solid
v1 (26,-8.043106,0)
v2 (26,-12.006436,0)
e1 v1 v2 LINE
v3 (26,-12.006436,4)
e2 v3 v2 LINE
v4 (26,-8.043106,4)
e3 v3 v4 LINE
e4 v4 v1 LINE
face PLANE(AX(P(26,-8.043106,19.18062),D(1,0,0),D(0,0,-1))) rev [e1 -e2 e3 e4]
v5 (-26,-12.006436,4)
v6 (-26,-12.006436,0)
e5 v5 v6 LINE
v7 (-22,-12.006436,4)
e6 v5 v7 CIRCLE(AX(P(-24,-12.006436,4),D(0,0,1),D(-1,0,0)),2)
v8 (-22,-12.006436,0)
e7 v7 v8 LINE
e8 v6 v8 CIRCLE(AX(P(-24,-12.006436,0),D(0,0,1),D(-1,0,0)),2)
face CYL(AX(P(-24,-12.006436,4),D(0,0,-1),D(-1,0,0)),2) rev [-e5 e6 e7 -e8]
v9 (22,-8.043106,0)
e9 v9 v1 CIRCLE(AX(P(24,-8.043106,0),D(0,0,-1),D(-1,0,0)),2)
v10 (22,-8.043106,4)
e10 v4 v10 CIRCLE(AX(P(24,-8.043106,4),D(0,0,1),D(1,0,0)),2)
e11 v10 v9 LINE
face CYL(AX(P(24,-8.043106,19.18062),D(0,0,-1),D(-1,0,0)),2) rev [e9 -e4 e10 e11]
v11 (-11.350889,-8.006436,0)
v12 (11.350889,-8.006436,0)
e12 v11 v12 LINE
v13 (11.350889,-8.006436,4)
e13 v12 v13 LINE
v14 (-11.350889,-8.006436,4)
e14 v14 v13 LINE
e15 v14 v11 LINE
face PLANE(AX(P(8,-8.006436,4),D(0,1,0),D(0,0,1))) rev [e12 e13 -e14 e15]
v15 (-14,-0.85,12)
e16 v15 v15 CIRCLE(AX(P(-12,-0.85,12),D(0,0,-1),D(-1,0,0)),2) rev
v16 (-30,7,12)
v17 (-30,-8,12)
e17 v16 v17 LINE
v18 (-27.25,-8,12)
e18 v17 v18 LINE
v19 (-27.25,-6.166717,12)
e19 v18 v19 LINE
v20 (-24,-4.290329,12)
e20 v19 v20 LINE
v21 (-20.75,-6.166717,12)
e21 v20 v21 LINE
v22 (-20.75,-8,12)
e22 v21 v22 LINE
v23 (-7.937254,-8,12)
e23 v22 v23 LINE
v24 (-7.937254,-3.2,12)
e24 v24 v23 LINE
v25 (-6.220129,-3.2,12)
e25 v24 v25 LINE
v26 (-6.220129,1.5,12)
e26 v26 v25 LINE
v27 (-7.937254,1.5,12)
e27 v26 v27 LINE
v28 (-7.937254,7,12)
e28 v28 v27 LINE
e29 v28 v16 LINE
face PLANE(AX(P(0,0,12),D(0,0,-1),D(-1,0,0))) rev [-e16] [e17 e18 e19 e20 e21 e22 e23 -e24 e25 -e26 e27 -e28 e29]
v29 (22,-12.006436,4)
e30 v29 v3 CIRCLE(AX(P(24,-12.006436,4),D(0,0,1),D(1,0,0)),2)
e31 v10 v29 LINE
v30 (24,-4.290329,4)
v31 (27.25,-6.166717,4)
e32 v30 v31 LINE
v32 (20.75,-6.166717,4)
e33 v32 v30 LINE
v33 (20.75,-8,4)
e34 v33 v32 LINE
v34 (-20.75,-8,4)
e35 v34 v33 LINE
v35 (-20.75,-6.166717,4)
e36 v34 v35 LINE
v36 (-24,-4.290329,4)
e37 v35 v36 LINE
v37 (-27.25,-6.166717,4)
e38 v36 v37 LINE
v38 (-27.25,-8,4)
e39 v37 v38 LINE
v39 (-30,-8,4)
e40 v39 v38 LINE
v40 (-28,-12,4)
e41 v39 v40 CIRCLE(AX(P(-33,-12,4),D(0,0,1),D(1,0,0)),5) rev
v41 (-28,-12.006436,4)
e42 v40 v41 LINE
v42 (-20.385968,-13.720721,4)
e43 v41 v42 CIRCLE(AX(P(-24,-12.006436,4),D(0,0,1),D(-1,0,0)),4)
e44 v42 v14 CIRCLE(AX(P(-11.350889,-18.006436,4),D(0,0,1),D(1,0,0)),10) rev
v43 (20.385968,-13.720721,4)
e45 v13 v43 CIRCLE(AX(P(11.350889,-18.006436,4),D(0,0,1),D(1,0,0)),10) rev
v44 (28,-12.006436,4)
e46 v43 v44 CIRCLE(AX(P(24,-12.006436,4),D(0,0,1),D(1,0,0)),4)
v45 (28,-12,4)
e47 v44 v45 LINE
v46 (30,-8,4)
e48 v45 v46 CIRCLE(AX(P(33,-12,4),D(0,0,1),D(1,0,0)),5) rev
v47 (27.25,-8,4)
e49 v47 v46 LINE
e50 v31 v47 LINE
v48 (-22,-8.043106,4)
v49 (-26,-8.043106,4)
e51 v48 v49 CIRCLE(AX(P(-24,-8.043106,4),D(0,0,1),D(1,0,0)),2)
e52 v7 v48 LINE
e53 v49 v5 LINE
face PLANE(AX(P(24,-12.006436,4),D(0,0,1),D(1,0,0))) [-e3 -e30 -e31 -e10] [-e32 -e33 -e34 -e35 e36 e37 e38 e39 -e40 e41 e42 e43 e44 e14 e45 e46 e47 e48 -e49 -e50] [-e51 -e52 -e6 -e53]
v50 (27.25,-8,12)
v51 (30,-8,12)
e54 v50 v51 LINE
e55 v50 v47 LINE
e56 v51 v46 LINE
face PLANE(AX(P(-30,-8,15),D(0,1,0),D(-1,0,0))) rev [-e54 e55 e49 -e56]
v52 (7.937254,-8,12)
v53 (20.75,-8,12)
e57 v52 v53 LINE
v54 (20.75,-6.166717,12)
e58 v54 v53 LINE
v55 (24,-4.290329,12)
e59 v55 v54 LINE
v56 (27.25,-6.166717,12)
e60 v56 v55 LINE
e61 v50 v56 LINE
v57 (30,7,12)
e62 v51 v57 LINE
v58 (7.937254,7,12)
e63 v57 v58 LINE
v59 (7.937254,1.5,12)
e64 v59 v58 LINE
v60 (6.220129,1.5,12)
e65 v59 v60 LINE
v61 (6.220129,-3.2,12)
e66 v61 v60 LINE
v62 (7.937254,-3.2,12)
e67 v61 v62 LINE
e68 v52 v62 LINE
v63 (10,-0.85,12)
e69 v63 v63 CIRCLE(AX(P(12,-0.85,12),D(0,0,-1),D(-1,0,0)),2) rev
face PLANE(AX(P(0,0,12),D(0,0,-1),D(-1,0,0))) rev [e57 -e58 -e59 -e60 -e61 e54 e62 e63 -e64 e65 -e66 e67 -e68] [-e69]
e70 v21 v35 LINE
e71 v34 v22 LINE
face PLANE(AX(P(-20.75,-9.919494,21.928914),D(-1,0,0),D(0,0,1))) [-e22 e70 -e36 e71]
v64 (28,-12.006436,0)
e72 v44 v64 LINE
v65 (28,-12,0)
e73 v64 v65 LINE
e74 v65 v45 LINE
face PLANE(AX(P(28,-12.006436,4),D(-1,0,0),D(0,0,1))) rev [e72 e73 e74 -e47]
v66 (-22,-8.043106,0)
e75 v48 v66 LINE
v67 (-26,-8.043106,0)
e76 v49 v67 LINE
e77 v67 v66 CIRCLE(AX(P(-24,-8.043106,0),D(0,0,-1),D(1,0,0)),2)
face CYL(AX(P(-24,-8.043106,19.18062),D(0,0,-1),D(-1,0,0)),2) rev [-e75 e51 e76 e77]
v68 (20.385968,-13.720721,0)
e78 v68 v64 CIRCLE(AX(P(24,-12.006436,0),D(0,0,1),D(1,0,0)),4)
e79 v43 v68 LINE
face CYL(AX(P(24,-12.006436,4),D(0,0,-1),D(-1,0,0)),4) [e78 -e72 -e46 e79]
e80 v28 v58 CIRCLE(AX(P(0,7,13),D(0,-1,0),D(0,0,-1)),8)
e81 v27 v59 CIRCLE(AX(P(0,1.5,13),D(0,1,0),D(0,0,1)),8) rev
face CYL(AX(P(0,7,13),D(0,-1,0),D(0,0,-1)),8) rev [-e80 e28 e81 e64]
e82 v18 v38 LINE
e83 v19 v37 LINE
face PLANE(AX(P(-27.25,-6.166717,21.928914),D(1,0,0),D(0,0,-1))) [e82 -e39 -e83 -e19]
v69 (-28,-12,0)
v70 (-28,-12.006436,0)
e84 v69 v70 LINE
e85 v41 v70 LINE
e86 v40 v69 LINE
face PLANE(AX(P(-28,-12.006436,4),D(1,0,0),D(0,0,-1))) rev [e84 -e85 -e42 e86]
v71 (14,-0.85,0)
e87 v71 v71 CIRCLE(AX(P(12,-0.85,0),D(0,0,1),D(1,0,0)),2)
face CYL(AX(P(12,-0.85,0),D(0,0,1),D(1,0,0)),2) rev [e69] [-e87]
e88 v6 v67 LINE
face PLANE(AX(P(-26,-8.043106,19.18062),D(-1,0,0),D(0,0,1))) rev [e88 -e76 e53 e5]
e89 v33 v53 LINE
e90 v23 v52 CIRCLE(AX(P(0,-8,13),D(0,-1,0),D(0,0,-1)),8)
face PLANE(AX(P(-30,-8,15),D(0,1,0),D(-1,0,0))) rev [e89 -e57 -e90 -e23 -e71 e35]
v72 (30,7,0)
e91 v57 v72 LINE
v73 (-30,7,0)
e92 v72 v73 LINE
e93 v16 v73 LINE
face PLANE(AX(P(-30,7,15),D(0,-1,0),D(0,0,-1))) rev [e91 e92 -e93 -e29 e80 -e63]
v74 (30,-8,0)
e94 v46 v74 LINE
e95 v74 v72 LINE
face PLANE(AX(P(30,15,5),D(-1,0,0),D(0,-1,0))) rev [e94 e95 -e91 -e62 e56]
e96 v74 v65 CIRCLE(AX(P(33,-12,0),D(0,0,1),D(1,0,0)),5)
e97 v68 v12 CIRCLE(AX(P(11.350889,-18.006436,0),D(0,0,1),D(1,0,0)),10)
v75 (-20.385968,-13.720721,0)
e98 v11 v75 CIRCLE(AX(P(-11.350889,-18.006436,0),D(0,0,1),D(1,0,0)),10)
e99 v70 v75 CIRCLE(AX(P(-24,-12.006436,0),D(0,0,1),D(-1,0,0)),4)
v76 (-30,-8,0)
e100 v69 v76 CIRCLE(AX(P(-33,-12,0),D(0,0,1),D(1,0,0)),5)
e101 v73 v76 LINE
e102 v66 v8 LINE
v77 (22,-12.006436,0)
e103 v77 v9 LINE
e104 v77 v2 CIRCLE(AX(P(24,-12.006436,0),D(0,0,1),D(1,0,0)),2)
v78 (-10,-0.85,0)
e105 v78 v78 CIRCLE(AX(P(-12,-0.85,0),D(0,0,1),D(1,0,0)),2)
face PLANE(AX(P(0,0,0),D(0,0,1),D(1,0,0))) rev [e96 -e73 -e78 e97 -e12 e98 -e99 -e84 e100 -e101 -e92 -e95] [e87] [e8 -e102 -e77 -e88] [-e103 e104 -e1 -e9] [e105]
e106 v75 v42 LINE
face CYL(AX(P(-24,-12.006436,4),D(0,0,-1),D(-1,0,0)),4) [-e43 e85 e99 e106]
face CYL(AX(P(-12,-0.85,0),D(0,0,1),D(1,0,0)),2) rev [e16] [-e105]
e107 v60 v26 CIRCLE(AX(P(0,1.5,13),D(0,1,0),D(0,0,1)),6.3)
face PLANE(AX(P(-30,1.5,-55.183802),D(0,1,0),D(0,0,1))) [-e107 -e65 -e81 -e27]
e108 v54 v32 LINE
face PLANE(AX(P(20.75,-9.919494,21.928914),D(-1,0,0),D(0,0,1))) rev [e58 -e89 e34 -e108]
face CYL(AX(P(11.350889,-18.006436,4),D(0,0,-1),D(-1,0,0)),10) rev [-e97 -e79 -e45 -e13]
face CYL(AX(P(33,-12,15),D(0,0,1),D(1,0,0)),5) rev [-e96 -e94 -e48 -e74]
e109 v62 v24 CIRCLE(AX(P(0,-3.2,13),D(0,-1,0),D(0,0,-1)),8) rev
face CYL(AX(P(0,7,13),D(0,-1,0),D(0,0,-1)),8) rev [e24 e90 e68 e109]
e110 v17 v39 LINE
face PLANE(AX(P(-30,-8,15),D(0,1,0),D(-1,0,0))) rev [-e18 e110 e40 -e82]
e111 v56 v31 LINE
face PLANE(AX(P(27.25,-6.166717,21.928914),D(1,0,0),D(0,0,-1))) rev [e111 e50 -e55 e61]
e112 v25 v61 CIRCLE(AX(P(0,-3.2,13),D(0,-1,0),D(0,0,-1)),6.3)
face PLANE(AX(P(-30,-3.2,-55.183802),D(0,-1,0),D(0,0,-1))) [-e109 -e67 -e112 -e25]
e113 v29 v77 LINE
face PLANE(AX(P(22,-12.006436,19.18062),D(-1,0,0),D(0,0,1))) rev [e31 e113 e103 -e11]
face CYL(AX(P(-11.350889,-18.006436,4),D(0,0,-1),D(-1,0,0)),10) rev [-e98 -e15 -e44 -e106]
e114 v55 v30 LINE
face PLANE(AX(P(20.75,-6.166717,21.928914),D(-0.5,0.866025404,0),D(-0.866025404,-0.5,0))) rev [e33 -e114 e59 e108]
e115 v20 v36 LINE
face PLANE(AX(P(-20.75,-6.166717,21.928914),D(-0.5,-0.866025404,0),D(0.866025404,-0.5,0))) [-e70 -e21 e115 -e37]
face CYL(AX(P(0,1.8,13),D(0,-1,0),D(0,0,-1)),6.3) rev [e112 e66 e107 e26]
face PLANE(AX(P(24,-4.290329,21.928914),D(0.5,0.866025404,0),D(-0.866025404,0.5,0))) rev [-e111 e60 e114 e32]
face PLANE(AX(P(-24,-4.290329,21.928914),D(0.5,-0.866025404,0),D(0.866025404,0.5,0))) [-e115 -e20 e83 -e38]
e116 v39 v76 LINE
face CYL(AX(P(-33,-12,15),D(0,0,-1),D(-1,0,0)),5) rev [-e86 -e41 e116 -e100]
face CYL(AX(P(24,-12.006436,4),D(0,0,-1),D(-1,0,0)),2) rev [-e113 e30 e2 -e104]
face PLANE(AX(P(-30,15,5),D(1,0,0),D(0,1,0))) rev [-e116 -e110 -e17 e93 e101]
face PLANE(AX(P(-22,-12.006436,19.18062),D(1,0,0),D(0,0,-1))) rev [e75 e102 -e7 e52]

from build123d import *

# Parameters (mm, degrees)
SCHIZZO1_W                   = 60
SCHIZZO1_H                   = 30
ESTRUSIONE_ESTRUSIONE1_DEPTH = 5
SCHIZZO2_W                   = 60
SCHIZZO2_H                   = 8
ESTRUSIONE_ESTRUSIONE2_DEPTH = 20
SCHIZZO3_R                   = 5
TAGLIO_ESTRUSIONE1_DEPTH     = 8
RACCORDO1_R                  = 20
SCHIZZO4_W                   = 60
SCHIZZO4_H                   = 15
ESTRUSIONE_ESTRUSIONE3_DEPTH = 10
SCHIZZO6_R                   = 8
TAGLIO_ESTRUSIONE2_DEPTH     = 15
SCHIZZO8_W                   = 60
SCHIZZO8_H                   = 4.7
ESTRUSIONE_ESTRUSIONE4_DEPTH = 10
SCHIZZO9_R                   = 6.3
TAGLIO_ESTRUSIONE3_DEPTH     = 5
SCHIZZO10_R                  = 2
TAGLIO_ESTRUSIONE4_DEPTH     = 37.742346142
SCHIZZO11_W                  = 60
SCHIZZO11_H                  = 8
TAGLIO_ESTRUSIONE5_DEPTH     = 25
SCHIZZO14_W                  = 60
SCHIZZO14_H                  = 5
TAGLIO_ESTRUSIONE7_DEPTH     = 7
SCHIZZO12_R                  = 2
ESTRUSIONE_ESTRUSIONE5_DEPTH = 4
SCHIZZO17_W                  = 60
SCHIZZO17_H                  = 15
TAGLIO_ESTRUSIONE9_DEPTH     = 3
TAGLIO_ESTRUSIONE10_REACH    = 38.058
TAGLIO_ESTRUSIONE12_DEPTH    = 8
RACCORDO2_R                  = 5
RACCORDO3_R                  = 10


with BuildPart() as part:
    # Schizzo1 → Estrusione-Estrusione1 (new body)
    with BuildSketch(Plane.XY):
        Rectangle(SCHIZZO1_W, SCHIZZO1_H)
    extrude(amount=ESTRUSIONE_ESTRUSIONE1_DEPTH)

    # Schizzo2 → Estrusione-Estrusione2 (add)
    with BuildSketch(Plane.XY.offset(5)):
        with Locations((0, 11)):
            Rectangle(SCHIZZO2_W, SCHIZZO2_H)
    extrude(amount=ESTRUSIONE_ESTRUSIONE2_DEPTH)

    # Schizzo3 → Taglio-Estrusione1 (cut)
    with BuildSketch(Plane(origin=(0, 15, 0), x_dir=(1, 0, 0), z_dir=(0, 1, 0))):
        with Locations(Location((11, -13, 0), (0, 0, 270))):
            Circle(SCHIZZO3_R)
        with Locations(Location((-11, -13, 0), (0, 0, 270))):
            Circle(SCHIZZO3_R)
    extrude(amount=-TAGLIO_ESTRUSIONE1_DEPTH, mode=Mode.SUBTRACT)

    # Raccordo1
    raccordo1_edges = [part.edges().sort_by_distance(p)[0] for p in [
        (30, 11, 25),
        (-30, 11, 25),
    ]]
    fillet(raccordo1_edges, radius=RACCORDO1_R)

    # Schizzo4 → Estrusione-Estrusione3 (add)
    with BuildSketch(Plane.XY.offset(5)):
        with Locations((0, -0.5)):
            Rectangle(SCHIZZO4_W, SCHIZZO4_H)
    extrude(amount=ESTRUSIONE_ESTRUSIONE3_DEPTH)

    # Schizzo6 → Taglio-Estrusione2 (cut)
    with BuildSketch(Plane.XZ.offset(8)):
        with Locations((0, 13)):
            Circle(SCHIZZO6_R)
    extrude(amount=-TAGLIO_ESTRUSIONE2_DEPTH, mode=Mode.SUBTRACT)

    # Schizzo8 → Estrusione-Estrusione4 (add)
    with BuildSketch(Plane.XY.offset(15)):
        with Locations((0, -0.85)):
            Rectangle(SCHIZZO8_W, SCHIZZO8_H)
    extrude(amount=-ESTRUSIONE_ESTRUSIONE4_DEPTH)

    # Schizzo9 → Taglio-Estrusione3 (cut)
    with BuildSketch(Plane.XZ.offset(3.2)):
        with Locations((0, 13)):
            Circle(SCHIZZO9_R)
    extrude(amount=-TAGLIO_ESTRUSIONE3_DEPTH, mode=Mode.SUBTRACT)

    # Schizzo10 → Taglio-Estrusione4 (cut, through all)
    with BuildSketch(Plane.XY.offset(15)):
        with Locations((12, -0.85)):
            Circle(SCHIZZO10_R)
        with Locations((-12, -0.85)):
            Circle(SCHIZZO10_R)
    extrude(amount=-TAGLIO_ESTRUSIONE4_DEPTH, mode=Mode.SUBTRACT)

    # Schizzo11 → Taglio-Estrusione5 (cut)
    with BuildSketch(Plane(origin=(0, 0, 0), x_dir=(-1, 0, 0), z_dir=(0, 0, -1))):
        with Locations((0, 11)):
            Rectangle(SCHIZZO11_W, SCHIZZO11_H)
    extrude(amount=-TAGLIO_ESTRUSIONE5_DEPTH, mode=Mode.SUBTRACT)

    # Schizzo14 → Taglio-Estrusione7 (cut)
    with BuildSketch(Plane.XZ.offset(15)):
        with Locations((0, 2.5)):
            Rectangle(SCHIZZO14_W, SCHIZZO14_H)
    extrude(amount=-TAGLIO_ESTRUSIONE7_DEPTH, mode=Mode.SUBTRACT)

    # Schizzo12 → Estrusione-Estrusione5 (add)
    with BuildSketch(Plane.XY):
        with BuildLine():
            Line((-8, -8.006435696), (8, -8.006435696))
            Line((8, -8.006435696), (20, -8.006435696))
            Line((20, -8.006435696), (20, -12.006435696))
            ThreePointArc((20, -12.006435696), (24, -16.006435696), (28, -12.006435696))
            Line((28, -12.006435696), (28, -5.256435696))
            Line((28, -5.256435696), (-28, -5.256435696))
            Line((-28, -5.256435696), (-28, -12.006435696))
            ThreePointArc((-28, -12.006435696), (-24, -16.006435696), (-20, -12.006435696))
            Line((-20, -12.006435696), (-20, -8.006435696))
            Line((-20, -8.006435696), (-8, -8.006435696))
        make_face()
        with Locations((24, -12.006435696)):
            Circle(SCHIZZO12_R, mode=Mode.SUBTRACT)
        with Locations(Location((-24, -12.006435696, 0), (0, 0, 180))):
            Circle(SCHIZZO12_R, mode=Mode.SUBTRACT)
    extrude(amount=ESTRUSIONE_ESTRUSIONE5_DEPTH)

    # Schizzo17 → Taglio-Estrusione9 (cut)
    with BuildSketch(Plane.XY.offset(15)):
        with Locations((0, -0.5)):
            Rectangle(SCHIZZO17_W, SCHIZZO17_H)
    extrude(amount=-TAGLIO_ESTRUSIONE9_DEPTH, mode=Mode.SUBTRACT)

    # Taglio-Estrusione10: up to this face of the body (flat: up to its plane)
    taglio_estrusione10_end = Plane(part.part.faces().sort_by_distance((-18.942934314, -0.495179718, 12))[0])
    # Schizzo18 → Taglio-Estrusione10 (cut, up to the picked face)
    with BuildSketch(Plane(origin=(0, 0, 0), x_dir=(-1, 0, 0), z_dir=(0, 0, -1)), mode=Mode.PRIVATE) as taglio_estrusione10_sk1:
        with BuildLine():
            Line((-26, -8.043105695), (-26, -12.006435696))
            Line((-26, -12.006435696), (-22, -12.006435696))
            Line((-22, -12.006435696), (-22, -8.043105695))
            ThreePointArc((-22, -8.043105695), (-24, -6.043105695), (-26, -8.043105695))
        make_face()
    taglio_estrusione10_tool1 = split(extrude(taglio_estrusione10_sk1.sketch, amount=-TAGLIO_ESTRUSIONE10_REACH, mode=Mode.PRIVATE), bisect_by=taglio_estrusione10_end, keep=Keep.BOTH, mode=Mode.PRIVATE)
    # Schizzo18 → Taglio-Estrusione10 (cut, up to the picked face)
    with BuildSketch(Plane(origin=(0, 0, 0), x_dir=(-1, 0, 0), z_dir=(0, 0, -1)), mode=Mode.PRIVATE) as taglio_estrusione10_sk2:
        with BuildLine():
            Line((22, -12.006435696), (22, -8.043105695))
            ThreePointArc((22, -8.043105695), (24, -6.043105695), (26, -8.043105695))
            Line((26, -8.043105695), (26, -12.006435696))
            Line((26, -12.006435696), (22, -12.006435696))
        make_face()
    taglio_estrusione10_tool2 = split(extrude(taglio_estrusione10_sk2.sketch, amount=-TAGLIO_ESTRUSIONE10_REACH, mode=Mode.PRIVATE), bisect_by=taglio_estrusione10_end, keep=Keep.BOTH, mode=Mode.PRIVATE)
    add(taglio_estrusione10_tool1.solids().sort_by(Axis((24, -9.221369, 0), (0, 0, 1)))[0], mode=Mode.SUBTRACT)
    add(taglio_estrusione10_tool2.solids().sort_by(Axis((-24, -9.221369, 0), (0, 0, 1)))[0], mode=Mode.SUBTRACT)

    # Schizzo20 → Taglio-Estrusione12 (cut)
    with BuildSketch(Plane.XY.offset(4)):
        Polygon((-27.25, -9.91949407), (-24, -11.795882445), (-20.75, -9.91949407), (-20.75, -6.166717321), (-24, -4.290328946), (-27.25, -6.166717321), align=None)
    taglio_estrusione12 = extrude(amount=TAGLIO_ESTRUSIONE12_DEPTH, mode=Mode.SUBTRACT)

    # Specchia1: Taglio-Estrusione12 across plane
    add(taglio_estrusione12.mirror(Plane(origin=(0, 0, 0), x_dir=(0, 0, 1), z_dir=(1, 0, 0))), mode=Mode.SUBTRACT)

    # Raccordo2
    # the kernel refuses this fillet: 5 mm, written as the material it adds along each edge
    with BuildSketch(Plane(origin=(28, -8, 4), x_dir=(1, 0, 0), z_dir=(0, 0, -1))) as raccordo2_piece_1:
        with BuildLine():
            CenterArc((5, 4), RACCORDO2_R, 180, 53.130102354)
            Line((0, 4), (0, 0))
            Line((0, 0), (2, 0))
        make_face()
    extrude(amount=4)
    with BuildSketch(Plane(origin=(-28, -8, 0), x_dir=(2.553025400590997e-07, -0.9999999999999674, 0), z_dir=(0, 0, 1))) as raccordo2_piece_2:
        with BuildLine():
            CenterArc((4.000000448, -4.999998721), RACCORDO2_R, 89.959025437, 53.171095231)
            Line((-5.11e-07, -2), (-0.400000606, -1.700000128))
            ThreePointArc((-0.400000606, -1.700000128), (-0.500000255, -0.999999872), (-0.5, 1.28e-07))
            Line((-0.5, 1.28e-07), (1.28e-07, 0.5))
            Line((1.28e-07, 0.5), (4.003933724, 0.499999872))
            Line((4.003933724, 0.499999872), (4.003576153, 0))
        make_face()
    extrude(amount=4)

    # Raccordo3
    raccordo3_edges = [part.edges().sort_by_distance(p)[0] for p in [
        (-20, -8.006435696, 2),
        (20, -8.006435696, 2),
    ]]
    fillet(raccordo3_edges, radius=RACCORDO3_R)


solid = part.part
